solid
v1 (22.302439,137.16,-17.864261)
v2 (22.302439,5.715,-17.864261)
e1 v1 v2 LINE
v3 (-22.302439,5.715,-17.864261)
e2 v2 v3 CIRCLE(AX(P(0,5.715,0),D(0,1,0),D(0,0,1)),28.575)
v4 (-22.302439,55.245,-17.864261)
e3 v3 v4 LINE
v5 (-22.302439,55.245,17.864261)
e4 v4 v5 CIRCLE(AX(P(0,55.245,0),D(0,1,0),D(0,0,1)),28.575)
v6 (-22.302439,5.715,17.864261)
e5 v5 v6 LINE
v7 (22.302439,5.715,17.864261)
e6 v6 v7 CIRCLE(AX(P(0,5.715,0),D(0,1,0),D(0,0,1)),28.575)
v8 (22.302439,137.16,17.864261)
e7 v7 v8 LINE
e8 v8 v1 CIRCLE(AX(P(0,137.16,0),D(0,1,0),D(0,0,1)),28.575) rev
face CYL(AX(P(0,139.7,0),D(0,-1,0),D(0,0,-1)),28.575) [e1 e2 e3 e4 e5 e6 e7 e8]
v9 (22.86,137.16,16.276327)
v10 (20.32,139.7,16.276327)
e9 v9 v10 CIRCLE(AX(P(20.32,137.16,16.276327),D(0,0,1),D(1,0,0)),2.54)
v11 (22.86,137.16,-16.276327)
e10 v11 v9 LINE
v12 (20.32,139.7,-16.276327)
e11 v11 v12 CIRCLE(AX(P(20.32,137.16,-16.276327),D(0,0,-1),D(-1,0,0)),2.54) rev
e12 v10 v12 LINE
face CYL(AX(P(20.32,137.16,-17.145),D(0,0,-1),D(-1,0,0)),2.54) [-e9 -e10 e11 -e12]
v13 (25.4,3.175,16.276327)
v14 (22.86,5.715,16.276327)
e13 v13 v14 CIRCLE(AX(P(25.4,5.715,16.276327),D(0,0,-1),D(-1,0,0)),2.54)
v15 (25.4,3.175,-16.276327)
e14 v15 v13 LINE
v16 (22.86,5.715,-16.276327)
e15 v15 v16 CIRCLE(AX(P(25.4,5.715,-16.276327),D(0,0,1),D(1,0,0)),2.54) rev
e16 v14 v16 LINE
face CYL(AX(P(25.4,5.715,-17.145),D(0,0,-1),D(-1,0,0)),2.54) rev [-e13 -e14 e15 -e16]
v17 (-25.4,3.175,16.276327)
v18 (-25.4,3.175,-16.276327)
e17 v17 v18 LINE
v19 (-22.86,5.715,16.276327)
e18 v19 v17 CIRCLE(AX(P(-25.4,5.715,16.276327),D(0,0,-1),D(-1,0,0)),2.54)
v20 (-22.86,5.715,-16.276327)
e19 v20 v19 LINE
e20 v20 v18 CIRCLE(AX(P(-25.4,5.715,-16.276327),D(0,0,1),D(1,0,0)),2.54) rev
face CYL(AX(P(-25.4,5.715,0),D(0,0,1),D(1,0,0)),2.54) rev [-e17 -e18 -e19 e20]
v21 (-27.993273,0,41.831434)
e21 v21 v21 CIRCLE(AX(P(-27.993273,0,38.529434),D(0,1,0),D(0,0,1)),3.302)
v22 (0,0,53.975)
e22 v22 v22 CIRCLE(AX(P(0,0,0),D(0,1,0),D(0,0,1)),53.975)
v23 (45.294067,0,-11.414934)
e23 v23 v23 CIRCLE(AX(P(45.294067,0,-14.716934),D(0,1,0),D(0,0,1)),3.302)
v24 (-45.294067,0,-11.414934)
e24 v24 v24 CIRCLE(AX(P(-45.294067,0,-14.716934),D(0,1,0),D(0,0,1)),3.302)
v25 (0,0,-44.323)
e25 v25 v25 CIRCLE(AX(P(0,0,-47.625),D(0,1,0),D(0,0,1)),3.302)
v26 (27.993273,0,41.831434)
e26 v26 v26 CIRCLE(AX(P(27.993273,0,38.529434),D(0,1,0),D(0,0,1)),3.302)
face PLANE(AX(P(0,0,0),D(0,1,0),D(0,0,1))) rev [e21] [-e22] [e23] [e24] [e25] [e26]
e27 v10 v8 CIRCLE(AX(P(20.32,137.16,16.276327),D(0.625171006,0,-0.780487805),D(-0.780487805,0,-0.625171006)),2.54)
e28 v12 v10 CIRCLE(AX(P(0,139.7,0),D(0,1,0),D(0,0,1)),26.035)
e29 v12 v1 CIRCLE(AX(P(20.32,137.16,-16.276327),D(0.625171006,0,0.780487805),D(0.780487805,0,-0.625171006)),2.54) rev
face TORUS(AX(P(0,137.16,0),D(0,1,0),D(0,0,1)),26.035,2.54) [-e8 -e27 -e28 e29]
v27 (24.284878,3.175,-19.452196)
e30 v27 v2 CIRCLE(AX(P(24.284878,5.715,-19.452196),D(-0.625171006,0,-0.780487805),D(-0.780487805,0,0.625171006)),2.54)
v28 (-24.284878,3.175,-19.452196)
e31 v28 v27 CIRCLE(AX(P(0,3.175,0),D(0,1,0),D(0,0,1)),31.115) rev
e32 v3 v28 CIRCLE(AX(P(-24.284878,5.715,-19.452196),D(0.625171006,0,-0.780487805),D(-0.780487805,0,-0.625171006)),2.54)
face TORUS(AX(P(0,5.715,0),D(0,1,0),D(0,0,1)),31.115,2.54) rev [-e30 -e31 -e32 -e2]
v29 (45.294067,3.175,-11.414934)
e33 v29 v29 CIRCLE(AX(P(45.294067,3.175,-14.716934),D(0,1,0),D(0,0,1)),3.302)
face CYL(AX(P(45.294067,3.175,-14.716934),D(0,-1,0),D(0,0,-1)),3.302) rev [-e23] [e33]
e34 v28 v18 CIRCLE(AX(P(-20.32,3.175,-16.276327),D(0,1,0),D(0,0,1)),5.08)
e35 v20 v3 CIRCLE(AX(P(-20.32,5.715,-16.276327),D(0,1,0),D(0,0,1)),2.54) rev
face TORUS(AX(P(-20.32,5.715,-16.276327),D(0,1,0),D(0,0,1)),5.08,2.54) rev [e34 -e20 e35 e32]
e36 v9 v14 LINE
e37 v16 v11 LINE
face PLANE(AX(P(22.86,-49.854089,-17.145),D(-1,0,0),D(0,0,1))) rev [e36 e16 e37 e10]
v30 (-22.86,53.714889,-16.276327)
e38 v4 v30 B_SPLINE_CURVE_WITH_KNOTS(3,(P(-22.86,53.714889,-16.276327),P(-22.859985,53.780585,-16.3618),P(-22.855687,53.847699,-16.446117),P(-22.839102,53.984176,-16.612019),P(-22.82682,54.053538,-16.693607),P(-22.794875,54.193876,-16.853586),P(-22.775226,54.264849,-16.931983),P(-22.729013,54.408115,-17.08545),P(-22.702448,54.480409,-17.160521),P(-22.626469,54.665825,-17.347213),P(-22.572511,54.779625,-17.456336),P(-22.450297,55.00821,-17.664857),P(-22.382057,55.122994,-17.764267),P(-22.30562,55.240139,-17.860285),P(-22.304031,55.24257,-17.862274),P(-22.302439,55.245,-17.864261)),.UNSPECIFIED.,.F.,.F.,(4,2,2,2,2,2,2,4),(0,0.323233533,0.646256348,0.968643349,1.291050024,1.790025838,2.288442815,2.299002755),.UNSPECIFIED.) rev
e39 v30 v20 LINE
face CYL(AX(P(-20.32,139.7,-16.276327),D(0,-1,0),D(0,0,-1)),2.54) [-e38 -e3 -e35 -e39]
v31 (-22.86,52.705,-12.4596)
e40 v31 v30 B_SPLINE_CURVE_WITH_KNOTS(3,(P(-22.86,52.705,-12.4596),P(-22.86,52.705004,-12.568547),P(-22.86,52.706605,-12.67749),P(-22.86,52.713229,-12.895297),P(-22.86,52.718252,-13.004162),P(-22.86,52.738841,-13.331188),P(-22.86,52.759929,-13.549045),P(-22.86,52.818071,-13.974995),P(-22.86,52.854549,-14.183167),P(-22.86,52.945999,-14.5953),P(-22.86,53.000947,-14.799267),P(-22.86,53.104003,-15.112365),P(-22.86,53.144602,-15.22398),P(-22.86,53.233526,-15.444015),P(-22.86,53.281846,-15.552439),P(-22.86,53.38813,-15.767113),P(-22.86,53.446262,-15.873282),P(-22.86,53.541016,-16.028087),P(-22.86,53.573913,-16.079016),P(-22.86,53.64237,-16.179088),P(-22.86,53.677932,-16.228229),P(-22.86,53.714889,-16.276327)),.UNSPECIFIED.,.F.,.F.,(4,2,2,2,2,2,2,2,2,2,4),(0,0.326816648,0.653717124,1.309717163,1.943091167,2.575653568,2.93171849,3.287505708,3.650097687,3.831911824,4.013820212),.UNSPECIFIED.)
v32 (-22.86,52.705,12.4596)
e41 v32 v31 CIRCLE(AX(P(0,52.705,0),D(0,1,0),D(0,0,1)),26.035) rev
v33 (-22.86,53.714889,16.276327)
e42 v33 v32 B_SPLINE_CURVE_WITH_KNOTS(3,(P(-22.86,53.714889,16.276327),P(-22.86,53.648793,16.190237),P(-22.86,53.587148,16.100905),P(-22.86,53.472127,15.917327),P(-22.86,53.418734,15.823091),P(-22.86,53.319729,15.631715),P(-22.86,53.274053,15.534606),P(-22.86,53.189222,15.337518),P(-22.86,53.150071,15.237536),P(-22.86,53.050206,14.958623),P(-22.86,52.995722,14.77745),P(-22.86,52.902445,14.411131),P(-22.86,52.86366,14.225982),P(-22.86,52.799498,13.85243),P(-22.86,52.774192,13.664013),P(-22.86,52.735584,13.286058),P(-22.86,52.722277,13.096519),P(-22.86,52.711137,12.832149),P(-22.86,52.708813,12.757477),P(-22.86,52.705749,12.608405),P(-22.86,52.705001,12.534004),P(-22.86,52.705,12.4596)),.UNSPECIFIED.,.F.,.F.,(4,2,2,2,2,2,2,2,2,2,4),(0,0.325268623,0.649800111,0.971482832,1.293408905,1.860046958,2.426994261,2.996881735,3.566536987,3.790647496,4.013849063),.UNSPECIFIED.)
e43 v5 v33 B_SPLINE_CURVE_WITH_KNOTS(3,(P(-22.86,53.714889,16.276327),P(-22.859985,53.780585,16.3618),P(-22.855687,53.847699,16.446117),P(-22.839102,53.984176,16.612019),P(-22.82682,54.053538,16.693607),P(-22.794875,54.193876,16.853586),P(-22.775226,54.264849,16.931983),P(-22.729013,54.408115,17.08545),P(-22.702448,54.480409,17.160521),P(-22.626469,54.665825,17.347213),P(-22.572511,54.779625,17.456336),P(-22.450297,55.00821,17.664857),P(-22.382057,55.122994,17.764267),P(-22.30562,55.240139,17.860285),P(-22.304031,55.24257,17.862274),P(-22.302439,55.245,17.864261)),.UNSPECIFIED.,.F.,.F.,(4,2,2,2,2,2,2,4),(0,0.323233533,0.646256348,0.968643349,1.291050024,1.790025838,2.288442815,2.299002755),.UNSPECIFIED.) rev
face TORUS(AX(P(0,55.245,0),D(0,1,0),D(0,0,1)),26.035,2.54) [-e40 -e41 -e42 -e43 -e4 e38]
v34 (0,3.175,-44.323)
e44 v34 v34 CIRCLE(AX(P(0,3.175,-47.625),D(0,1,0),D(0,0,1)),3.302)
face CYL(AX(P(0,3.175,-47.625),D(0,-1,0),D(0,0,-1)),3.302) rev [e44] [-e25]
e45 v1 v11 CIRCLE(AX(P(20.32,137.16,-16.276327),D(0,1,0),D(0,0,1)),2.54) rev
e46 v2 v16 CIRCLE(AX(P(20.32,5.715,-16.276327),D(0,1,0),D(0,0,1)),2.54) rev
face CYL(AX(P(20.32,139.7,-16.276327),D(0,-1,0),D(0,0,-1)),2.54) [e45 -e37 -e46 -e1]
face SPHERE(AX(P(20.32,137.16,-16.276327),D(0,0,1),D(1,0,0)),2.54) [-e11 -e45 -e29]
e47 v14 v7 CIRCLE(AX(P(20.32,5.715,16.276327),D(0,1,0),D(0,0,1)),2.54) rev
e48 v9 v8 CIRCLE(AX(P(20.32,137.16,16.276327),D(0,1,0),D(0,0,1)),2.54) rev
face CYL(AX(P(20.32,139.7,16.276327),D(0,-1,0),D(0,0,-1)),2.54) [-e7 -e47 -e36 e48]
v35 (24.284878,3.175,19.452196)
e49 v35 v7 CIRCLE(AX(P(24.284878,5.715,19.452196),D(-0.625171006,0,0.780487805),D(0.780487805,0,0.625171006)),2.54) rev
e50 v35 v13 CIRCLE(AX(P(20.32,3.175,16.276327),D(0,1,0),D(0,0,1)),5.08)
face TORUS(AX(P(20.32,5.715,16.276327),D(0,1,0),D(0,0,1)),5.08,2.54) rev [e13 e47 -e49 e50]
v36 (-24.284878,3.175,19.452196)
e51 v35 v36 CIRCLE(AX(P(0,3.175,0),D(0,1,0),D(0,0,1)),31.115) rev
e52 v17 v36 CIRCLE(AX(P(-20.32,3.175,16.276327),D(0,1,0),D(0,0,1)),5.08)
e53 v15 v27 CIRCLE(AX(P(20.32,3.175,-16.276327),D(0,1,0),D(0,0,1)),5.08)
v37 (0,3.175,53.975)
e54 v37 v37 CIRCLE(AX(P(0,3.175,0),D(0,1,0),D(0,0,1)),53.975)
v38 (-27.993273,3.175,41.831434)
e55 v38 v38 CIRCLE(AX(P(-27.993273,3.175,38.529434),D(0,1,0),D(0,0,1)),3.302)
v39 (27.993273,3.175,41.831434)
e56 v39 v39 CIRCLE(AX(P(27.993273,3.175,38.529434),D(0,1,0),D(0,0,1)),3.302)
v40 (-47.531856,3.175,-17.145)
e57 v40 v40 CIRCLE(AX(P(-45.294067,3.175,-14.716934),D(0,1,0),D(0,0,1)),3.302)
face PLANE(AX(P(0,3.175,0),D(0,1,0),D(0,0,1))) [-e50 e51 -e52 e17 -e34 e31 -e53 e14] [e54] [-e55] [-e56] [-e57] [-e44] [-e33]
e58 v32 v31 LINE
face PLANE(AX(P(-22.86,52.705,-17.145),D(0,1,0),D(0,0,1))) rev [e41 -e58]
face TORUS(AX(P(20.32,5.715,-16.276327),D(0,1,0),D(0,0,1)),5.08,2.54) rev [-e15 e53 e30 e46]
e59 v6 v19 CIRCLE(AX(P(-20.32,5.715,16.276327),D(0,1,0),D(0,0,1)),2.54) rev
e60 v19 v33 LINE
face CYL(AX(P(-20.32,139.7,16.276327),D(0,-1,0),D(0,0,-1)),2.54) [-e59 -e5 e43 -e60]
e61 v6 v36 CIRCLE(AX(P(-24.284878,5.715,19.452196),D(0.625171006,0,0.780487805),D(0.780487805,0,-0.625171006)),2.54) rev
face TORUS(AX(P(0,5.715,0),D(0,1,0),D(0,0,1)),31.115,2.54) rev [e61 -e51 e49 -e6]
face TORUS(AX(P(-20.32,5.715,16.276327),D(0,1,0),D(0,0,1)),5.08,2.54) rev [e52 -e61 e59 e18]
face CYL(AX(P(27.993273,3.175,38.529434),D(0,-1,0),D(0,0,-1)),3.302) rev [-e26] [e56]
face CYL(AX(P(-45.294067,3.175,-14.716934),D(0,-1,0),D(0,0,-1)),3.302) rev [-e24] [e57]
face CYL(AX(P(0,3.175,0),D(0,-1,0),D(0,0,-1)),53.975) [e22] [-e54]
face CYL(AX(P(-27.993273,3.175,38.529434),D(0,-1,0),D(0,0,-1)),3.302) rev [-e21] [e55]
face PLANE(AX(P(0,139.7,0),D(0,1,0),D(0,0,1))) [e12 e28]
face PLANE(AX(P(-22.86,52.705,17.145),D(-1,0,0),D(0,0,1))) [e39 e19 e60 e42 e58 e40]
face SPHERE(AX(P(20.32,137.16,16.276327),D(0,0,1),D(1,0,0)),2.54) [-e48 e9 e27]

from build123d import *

# Parameters (mm, degrees)
SKETCH1_R           = 53.975
SKETCH1_R_2         = 3.302
BOSS_EXTRUDE1_DEPTH = 3.175
SKETCH2_R           = 28.575
BOSS_EXTRUDE2_DEPTH = 136.525
SKETCH3_W           = 40.450959828
SKETCH3_H           = 34.29
CUT_EXTRUDE1_DEPTH  = 136.525
SKETCH4_W           = 24.671855952
SKETCH4_H           = 34.29
CUT_EXTRUDE2_DEPTH  = 49.53
FILLET1_R           = 2.54


with BuildPart() as part:
    # Sketch1 → Boss-Extrude1 (new body)
    with BuildSketch(Plane(origin=(0, 0, 0), x_dir=(1, 0, 0), z_dir=(0, 1, 0))):
        with Locations(Location((0, 0, 0), (0, 0, 270))):
            Circle(SKETCH1_R)
        with Locations(Location((0, 47.625, 0), (0, 0, 270))):
            Circle(SKETCH1_R_2, mode=Mode.SUBTRACT)
        with Locations(Location((45.294066589, 14.716934357, 0), (0, 0, 270))):
            Circle(SKETCH1_R_2, mode=Mode.SUBTRACT)
        with Locations(Location((27.99327264, -38.529434357, 0), (0, 0, 270))):
            Circle(SKETCH1_R_2, mode=Mode.SUBTRACT)
        with Locations(Location((-27.99327264, -38.529434357, 0), (0, 0, 270))):
            Circle(SKETCH1_R_2, mode=Mode.SUBTRACT)
        with Locations(Location((-45.294066589, 14.716934357, 0), (0, 0, 270))):
            Circle(SKETCH1_R_2, mode=Mode.SUBTRACT)
    extrude(amount=BOSS_EXTRUDE1_DEPTH)

    # Sketch2 → Boss-Extrude2 (add)
    with BuildSketch(Plane(origin=(0, 3.175, 0), x_dir=(1, 0, 0), z_dir=(0, 1, 0))):
        with Locations(Location((0, 0, 0), (0, 0, 270))):
            Circle(SKETCH2_R)
    extrude(amount=BOSS_EXTRUDE2_DEPTH)

    # Sketch3 → Cut-Extrude1 (cut)
    with BuildSketch(Plane(origin=(0, 139.7, 0), x_dir=(1, 0, 0), z_dir=(0, 1, 0))):
        with Locations((43.085479914, 0)):
            Rectangle(SKETCH3_W, SKETCH3_H)
    extrude(amount=-CUT_EXTRUDE1_DEPTH, mode=Mode.SUBTRACT)

    # Sketch4 → Cut-Extrude2 (cut)
    with BuildSketch(Plane(origin=(0, 3.175, 0), x_dir=(1, 0, 0), z_dir=(0, 1, 0))):
        with Locations((-35.195927976, 0)):
            Rectangle(SKETCH4_W, SKETCH4_H)
    extrude(amount=CUT_EXTRUDE2_DEPTH, mode=Mode.SUBTRACT)

    # Fillet1
    fillet1_edges = [part.edges().sort_by_distance(p)[0] for p in [
        (-28.575, 139.7, 0),
        (22.86, 139.7, 0),
        (22.86, 71.4375, 17.145),
        (22.86, 71.4375, -17.145),
        (-28.575, 52.705, 0),
        (-22.86, 27.94, 17.145),
        (-22.86, 27.94, -17.145),
    ]]
    fillet(fillet1_edges, radius=FILLET1_R)
    fillet1_2_edges = [part.edges().sort_by_distance(p)[0] for p in [
        (0, 3.175, -28.575),
        (22.86, 3.175, 0),
        (0, 3.175, 28.575),
        (-22.86, 3.175, 0),
        (-22.716559526, 3.175, -17.117815364),
        (-22.716559526, 3.175, 17.117815364),
        (22.716559526, 3.175, 17.117815364),
        (22.716559526, 3.175, -17.117815364),
    ]]
    fillet(fillet1_2_edges, radius=FILLET1_R)


solid = part.part
